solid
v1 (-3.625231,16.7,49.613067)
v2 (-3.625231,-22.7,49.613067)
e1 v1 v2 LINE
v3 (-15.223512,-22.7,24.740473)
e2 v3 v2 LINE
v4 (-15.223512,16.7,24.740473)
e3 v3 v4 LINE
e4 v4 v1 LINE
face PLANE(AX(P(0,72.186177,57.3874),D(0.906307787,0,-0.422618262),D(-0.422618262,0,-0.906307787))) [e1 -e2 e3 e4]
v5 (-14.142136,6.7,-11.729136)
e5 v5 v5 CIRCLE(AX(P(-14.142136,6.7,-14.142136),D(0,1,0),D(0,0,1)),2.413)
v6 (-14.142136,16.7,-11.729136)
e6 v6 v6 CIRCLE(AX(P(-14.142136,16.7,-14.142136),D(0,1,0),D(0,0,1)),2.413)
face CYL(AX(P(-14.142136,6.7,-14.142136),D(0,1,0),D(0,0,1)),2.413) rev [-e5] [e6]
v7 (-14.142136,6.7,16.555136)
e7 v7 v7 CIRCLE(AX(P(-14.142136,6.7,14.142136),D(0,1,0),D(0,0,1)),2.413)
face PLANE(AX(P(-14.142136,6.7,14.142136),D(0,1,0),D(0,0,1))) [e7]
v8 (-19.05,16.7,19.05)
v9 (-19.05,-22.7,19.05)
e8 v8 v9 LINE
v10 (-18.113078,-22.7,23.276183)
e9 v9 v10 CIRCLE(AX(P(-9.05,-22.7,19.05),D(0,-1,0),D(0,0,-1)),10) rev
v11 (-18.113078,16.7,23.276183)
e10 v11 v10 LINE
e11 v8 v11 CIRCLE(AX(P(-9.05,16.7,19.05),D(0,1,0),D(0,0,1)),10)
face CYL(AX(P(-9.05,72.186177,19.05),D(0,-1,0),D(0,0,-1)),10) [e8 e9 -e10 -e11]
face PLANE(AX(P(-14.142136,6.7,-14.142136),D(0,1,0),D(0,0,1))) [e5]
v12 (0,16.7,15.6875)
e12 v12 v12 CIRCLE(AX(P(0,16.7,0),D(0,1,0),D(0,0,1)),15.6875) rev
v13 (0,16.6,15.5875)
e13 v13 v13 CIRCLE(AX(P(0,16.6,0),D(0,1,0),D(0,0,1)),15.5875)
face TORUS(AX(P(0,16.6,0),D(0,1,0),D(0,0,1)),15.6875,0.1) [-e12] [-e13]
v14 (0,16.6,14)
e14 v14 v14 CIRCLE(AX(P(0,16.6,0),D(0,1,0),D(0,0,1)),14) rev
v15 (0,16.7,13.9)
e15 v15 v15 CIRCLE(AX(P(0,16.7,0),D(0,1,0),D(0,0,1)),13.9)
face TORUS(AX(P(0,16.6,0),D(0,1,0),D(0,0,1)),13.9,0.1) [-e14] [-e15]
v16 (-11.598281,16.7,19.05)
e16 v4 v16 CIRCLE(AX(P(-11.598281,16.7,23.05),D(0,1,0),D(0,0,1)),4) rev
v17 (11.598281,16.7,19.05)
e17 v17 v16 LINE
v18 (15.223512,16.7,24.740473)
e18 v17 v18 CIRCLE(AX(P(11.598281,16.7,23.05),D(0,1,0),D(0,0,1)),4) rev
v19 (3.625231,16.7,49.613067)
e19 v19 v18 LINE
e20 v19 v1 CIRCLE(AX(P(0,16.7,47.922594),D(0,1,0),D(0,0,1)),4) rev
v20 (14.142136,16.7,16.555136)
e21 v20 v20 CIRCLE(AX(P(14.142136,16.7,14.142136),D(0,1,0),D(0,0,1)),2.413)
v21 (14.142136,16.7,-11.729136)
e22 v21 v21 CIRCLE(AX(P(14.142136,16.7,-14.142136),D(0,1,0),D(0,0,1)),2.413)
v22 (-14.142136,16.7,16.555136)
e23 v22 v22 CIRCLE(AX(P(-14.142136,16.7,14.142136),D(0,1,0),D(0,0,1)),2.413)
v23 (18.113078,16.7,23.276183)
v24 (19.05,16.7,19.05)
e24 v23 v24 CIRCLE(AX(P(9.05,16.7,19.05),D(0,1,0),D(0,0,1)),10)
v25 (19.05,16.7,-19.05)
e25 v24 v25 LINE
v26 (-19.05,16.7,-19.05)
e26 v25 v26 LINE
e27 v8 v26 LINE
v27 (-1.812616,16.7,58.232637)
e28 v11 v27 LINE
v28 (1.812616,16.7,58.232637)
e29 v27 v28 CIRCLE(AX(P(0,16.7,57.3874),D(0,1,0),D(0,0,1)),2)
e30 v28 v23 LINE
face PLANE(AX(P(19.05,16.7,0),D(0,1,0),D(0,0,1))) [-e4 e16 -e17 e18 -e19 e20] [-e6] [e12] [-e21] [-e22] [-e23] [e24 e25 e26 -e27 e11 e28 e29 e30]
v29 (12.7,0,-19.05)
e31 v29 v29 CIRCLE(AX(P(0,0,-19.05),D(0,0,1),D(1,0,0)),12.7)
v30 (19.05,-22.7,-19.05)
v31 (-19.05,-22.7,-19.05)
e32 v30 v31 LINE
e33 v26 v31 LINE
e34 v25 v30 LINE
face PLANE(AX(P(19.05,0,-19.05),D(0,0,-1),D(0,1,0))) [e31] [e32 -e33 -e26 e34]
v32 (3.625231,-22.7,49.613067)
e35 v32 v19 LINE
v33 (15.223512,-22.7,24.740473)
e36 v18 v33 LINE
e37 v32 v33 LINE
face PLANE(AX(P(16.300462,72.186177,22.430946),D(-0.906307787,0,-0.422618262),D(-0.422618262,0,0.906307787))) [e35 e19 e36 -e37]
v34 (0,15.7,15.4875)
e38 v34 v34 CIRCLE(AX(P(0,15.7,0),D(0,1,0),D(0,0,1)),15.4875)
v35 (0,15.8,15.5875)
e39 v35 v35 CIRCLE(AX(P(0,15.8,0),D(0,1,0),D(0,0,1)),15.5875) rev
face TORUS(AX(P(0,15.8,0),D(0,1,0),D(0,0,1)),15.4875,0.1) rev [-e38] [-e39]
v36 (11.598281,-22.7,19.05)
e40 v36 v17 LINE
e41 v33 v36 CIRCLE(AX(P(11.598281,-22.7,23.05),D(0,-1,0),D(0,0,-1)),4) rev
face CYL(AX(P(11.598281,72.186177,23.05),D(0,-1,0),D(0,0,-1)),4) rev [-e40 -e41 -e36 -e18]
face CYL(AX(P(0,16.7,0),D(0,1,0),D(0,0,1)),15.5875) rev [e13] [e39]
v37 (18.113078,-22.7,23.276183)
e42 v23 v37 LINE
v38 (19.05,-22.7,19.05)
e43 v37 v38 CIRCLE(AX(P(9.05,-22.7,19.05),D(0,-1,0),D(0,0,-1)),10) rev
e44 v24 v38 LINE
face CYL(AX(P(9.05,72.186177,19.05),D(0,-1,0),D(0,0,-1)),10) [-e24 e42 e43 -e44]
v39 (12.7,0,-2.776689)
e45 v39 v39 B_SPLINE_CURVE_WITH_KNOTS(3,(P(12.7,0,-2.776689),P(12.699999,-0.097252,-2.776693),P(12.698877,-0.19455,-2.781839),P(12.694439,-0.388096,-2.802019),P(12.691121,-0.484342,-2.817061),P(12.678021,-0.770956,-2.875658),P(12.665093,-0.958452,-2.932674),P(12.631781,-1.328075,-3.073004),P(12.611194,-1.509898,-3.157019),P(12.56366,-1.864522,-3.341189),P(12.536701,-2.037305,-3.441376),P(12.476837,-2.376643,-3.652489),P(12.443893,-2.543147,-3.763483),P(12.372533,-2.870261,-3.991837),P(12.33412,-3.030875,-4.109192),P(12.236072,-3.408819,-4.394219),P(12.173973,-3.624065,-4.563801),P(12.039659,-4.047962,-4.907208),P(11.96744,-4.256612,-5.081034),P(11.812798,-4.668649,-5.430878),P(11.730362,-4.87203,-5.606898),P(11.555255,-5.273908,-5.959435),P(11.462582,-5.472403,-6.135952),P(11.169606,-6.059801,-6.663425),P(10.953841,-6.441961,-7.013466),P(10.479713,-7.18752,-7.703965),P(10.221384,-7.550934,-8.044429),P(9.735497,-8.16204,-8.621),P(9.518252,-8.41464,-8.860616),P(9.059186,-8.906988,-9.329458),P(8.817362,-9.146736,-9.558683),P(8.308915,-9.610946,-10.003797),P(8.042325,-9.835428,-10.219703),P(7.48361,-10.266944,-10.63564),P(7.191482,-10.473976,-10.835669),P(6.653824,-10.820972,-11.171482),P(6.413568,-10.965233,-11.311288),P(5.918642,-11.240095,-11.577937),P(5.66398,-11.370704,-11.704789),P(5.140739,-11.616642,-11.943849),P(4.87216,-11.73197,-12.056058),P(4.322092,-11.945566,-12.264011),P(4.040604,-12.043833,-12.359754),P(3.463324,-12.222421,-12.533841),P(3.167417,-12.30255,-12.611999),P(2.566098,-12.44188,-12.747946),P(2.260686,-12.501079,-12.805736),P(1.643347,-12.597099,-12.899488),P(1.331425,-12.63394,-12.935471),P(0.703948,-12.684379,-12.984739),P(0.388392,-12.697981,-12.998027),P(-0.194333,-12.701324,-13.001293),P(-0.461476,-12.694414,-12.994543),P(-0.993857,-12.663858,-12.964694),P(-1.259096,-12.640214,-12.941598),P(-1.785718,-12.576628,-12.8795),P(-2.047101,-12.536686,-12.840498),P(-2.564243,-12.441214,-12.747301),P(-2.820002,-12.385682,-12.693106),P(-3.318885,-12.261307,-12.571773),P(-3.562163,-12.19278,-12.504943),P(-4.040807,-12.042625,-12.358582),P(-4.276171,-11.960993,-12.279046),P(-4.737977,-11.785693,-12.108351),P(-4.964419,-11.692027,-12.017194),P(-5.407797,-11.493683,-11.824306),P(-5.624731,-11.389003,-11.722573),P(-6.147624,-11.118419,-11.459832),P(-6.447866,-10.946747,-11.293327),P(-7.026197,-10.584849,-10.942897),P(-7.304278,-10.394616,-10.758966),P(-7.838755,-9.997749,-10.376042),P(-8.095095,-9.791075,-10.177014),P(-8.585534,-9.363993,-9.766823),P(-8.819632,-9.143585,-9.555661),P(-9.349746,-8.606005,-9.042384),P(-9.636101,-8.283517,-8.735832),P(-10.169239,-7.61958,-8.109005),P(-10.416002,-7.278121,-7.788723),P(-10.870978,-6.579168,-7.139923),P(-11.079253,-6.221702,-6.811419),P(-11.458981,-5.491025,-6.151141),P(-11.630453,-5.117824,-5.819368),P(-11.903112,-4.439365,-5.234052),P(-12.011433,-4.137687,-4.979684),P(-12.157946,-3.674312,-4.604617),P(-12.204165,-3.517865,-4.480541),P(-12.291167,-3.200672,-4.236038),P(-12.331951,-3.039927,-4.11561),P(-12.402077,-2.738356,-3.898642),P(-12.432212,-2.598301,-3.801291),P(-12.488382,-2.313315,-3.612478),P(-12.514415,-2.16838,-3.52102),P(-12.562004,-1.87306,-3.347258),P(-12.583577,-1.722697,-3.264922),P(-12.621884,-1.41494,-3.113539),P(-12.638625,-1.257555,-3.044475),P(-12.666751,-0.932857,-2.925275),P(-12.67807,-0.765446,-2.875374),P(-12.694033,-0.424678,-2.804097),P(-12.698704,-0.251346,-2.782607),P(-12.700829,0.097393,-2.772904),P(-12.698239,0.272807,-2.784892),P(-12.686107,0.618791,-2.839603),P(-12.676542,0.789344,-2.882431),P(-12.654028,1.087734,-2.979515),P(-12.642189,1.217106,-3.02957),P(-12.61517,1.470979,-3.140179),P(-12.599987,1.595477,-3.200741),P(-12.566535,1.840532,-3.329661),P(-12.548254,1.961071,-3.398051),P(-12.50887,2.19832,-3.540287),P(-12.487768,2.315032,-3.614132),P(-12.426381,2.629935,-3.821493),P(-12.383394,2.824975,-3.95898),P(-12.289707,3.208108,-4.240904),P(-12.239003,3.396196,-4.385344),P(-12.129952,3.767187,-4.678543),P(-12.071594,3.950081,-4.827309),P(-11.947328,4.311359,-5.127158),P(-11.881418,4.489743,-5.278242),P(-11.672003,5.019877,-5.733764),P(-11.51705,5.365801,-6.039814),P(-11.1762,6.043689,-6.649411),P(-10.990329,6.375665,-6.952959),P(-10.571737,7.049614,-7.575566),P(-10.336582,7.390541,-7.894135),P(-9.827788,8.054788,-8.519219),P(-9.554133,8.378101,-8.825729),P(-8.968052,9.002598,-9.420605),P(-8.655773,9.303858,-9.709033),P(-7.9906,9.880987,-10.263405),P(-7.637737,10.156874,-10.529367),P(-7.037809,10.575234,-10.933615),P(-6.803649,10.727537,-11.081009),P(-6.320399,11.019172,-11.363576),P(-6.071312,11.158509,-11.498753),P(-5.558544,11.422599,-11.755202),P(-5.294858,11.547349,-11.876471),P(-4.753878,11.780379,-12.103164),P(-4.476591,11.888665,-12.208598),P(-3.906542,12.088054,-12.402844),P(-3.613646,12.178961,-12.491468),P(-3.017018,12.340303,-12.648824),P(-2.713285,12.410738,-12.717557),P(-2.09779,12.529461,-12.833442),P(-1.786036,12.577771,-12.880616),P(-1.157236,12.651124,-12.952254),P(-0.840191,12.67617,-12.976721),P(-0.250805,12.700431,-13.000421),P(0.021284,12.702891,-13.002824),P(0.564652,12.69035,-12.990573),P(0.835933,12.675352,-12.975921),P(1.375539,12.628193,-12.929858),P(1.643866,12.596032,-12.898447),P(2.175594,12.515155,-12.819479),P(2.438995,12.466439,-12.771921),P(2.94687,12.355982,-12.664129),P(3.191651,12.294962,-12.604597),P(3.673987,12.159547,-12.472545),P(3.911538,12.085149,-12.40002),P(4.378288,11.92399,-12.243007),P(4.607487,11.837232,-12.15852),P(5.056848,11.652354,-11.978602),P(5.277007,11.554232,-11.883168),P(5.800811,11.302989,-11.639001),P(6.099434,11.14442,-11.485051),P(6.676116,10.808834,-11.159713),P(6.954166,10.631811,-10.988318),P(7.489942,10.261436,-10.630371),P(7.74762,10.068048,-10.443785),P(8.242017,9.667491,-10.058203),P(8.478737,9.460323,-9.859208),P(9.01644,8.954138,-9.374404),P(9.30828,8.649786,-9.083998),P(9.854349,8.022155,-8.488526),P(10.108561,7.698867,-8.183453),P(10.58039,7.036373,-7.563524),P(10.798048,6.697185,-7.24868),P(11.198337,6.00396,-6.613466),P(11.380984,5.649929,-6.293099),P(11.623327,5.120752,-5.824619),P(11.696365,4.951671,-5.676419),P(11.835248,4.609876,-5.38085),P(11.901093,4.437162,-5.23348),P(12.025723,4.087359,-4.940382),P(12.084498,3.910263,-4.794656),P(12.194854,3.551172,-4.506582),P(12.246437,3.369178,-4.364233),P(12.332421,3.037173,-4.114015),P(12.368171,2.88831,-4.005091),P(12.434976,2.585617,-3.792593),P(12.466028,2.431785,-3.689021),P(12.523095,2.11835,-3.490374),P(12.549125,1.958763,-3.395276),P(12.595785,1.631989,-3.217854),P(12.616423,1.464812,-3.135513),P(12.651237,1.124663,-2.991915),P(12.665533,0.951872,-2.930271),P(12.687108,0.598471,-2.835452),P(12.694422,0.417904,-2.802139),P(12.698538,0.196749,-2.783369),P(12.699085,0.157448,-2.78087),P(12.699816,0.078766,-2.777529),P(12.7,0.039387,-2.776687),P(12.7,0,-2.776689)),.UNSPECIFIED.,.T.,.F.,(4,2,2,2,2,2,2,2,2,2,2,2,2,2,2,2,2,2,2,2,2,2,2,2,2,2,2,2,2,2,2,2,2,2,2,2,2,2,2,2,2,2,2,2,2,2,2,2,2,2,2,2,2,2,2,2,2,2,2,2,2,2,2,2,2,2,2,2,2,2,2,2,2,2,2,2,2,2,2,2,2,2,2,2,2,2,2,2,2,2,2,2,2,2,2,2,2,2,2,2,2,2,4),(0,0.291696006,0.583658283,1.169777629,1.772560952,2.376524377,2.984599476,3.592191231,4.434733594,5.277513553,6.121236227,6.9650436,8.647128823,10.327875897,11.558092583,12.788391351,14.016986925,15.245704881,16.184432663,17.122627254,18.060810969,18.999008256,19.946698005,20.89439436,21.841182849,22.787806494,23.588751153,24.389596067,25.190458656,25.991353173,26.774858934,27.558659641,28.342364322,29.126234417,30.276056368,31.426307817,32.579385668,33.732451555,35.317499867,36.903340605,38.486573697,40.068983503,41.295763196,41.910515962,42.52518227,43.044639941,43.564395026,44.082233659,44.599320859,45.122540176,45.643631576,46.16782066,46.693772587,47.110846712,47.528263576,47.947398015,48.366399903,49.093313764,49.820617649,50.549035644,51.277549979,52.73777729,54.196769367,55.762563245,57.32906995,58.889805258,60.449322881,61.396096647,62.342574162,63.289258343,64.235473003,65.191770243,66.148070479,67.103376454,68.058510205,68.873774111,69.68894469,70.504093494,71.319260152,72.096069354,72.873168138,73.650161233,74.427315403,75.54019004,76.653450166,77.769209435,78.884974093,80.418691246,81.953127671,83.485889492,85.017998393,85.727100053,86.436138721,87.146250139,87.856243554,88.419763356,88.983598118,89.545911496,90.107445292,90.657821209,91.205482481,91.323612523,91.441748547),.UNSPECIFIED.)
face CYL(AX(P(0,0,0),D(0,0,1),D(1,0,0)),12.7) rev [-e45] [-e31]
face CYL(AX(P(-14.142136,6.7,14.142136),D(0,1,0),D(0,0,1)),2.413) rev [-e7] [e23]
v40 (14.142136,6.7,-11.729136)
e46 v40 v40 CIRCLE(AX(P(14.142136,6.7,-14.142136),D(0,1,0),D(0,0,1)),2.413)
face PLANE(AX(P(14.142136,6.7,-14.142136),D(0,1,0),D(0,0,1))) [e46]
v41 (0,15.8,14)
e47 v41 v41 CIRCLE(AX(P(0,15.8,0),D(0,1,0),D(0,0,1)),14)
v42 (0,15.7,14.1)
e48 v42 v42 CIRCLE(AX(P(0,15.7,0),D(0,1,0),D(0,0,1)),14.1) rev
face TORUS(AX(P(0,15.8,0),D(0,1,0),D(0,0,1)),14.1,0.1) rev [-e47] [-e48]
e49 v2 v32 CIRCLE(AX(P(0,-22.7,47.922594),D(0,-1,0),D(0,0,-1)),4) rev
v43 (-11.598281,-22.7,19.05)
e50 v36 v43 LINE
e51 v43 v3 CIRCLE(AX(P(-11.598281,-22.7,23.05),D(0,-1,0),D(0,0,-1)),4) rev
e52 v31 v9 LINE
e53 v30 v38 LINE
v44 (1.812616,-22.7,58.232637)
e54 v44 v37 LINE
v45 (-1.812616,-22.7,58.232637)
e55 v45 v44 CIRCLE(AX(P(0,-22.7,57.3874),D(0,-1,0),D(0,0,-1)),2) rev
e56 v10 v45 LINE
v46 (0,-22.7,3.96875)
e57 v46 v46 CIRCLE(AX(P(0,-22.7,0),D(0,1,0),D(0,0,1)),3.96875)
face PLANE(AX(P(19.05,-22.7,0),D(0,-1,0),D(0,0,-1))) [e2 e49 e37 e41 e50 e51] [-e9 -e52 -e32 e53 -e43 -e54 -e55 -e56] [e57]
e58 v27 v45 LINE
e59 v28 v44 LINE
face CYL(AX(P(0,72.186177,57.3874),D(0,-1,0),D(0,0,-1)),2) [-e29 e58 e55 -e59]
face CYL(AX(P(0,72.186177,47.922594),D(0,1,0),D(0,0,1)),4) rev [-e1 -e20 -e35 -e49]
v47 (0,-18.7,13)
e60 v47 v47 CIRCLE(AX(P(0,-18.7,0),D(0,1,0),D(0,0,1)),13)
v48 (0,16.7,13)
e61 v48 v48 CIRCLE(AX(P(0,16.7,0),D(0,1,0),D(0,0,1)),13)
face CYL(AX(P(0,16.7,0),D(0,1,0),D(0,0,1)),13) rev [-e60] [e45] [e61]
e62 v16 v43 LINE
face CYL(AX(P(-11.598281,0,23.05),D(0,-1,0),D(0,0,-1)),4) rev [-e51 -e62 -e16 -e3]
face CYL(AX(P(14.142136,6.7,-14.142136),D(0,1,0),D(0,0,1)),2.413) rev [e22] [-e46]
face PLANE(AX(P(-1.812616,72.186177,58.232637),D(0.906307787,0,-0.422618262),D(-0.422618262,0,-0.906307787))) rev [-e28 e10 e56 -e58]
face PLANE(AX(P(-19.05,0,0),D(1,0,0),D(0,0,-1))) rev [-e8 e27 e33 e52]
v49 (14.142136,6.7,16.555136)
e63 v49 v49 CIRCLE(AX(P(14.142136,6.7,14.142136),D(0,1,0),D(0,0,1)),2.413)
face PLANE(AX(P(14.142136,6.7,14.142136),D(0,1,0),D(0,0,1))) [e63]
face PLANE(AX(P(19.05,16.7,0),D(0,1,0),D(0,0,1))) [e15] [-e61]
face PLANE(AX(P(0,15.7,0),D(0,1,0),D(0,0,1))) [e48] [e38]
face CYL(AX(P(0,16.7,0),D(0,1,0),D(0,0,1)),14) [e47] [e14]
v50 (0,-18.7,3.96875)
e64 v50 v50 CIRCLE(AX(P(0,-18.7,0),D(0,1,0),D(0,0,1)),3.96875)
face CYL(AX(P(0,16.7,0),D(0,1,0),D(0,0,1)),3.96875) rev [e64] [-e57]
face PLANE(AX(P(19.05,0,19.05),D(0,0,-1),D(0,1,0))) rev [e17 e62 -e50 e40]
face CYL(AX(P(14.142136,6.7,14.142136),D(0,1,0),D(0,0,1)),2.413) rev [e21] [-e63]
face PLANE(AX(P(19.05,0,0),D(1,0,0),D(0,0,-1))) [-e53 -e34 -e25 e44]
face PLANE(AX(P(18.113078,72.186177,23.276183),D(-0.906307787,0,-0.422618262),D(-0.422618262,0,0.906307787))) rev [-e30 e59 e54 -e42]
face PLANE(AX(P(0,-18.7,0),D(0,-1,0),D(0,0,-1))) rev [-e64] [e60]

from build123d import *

# Parameters (mm, degrees)
SKETCH1_W                       = 39.4
SKETCH1_H                       = 38.1
BOSS_EXTRUDE1_DEPTH             = 19.05
SKETCH1_4_W                     = 12.7
SKETCH1_4_H                     = 19.05
SKETCH1_5_W                     = 1
SKETCH1_5_H                     = 1.5875
FILLET2_R                       = 0.1
SKETCH2_R                       = 2.413
CUT_EXTRUDE1_DEPTH              = 10
EXTRUDE_THIN1_REACH             = 37.229
EXTRUDE_THIN1_DIRECTION_2_REACH = 37.229
FILLET5_R                       = 4


with BuildPart() as part:
    # Sketch1 → Boss-Extrude1 (new, symmetric)
    with BuildSketch(Plane.YZ):
        with Locations((-3, 0)):
            Rectangle(SKETCH1_W, SKETCH1_H)
    extrude(amount=BOSS_EXTRUDE1_DEPTH, both=True)

    # Sketch1<3> → Cut-Revolve1 (revolve, cut)
    with BuildSketch(Plane.YZ):
        Polygon((16.7, 0), (16.7, 13), (-18.7, 13), (-18.7, 3.96875), (-22.7, 3.96875), (-22.7, 0), align=None)
    revolve(axis=Axis((0, 16.7, 0), (0, -1, 0)), mode=Mode.SUBTRACT)

    # Sketch1<4> → Cut-Revolve2 (revolve, cut)
    with BuildSketch(Plane.YZ):
        with Locations((6.35, -9.525)):
            Rectangle(SKETCH1_4_W, SKETCH1_4_H)
    revolve(axis=Axis((0, 0, 0), (0, 0, -1)), mode=Mode.SUBTRACT)

    # Sketch1<5> → Cut-Revolve3 (revolve, cut)
    with BuildSketch(Plane.YZ):
        with Locations((16.2, 14.79375)):
            Rectangle(SKETCH1_5_W, SKETCH1_5_H)
    revolve(axis=Axis((0, 16.7, 0), (0, -1, 0)), mode=Mode.SUBTRACT)

    # Fillet2
    fillet2_edges = [part.edges().sort_by_distance(p)[0] for p in [
        (0, 16.7, -15.5875),
        (0, 15.7, -15.5875),
        (0, 15.7, -14),
        (0, 16.7, -14),
    ]]
    fillet(fillet2_edges, radius=FILLET2_R)

    # Sketch2 → Cut-Extrude1 (cut)
    with BuildSketch(Plane(origin=(0, 16.7, 0), x_dir=(-1, 0, 0), z_dir=(0, 1, 0))):
        with Locations((-14.142135624, 14.142135624)):
            Circle(SKETCH2_R)
        with Locations((14.142135624, 14.142135624)):
            Circle(SKETCH2_R)
        with Locations((14.142135624, -14.142135624)):
            Circle(SKETCH2_R)
        with Locations((-14.142135624, -14.142135624)):
            Circle(SKETCH2_R)
    extrude(amount=-CUT_EXTRUDE1_DEPTH, mode=Mode.SUBTRACT)

    # Extrude-Thin1: up to this face of the body (flat: up to its plane)
    extrude_thin1_end = Plane(part.part.faces().sort_by_distance((-18.511184633, 16.7, 0))[0])
    # Sketch3 → Extrude-Thin1 (add, up to the picked face)
    with BuildSketch(Plane(origin=(0, 0, 0), x_dir=(-1, 0, 0), z_dir=(0, 1, 0)), mode=Mode.PRIVATE) as extrude_thin1_sk1:
        with BuildLine():
            ThreePointArc((-19.05, 19.05), (-18.812960071, 21.214396139), (-18.11307787, 23.276182617))
            Line((-18.11307787, 23.276182617), (-1.812615574, 58.232636819))
            ThreePointArc((-1.812615574, 58.232636819), (0, 59.387400296), (1.812615574, 58.232636819))
            Line((1.812615574, 58.232636819), (18.11307787, 23.276182617))
            ThreePointArc((18.11307787, 23.276182617), (18.812960071, 21.214396139), (19.05, 19.05))
            Line((19.05, 19.05), (17.05, 19.05))
            ThreePointArc((17.05, 19.05), (16.860368057, 20.781516912), (16.300462296, 22.430946094))
            Line((16.300462296, 22.430946094), (0, 57.387400296))
            Line((0, 57.387400296), (-16.300462296, 22.430946094))
            ThreePointArc((-16.300462296, 22.430946094), (-16.860368057, 20.781516912), (-17.05, 19.05))
            Line((-17.05, 19.05), (-19.05, 19.05))
        make_face()
    extrude_thin1_tool1 = split(extrude(extrude_thin1_sk1.sketch, amount=EXTRUDE_THIN1_REACH, mode=Mode.PRIVATE), bisect_by=extrude_thin1_end, keep=Keep.BOTH, mode=Mode.PRIVATE)
    add(extrude_thin1_tool1.solids().sort_by(Axis((18.271251, 0, 21.094302), (0, 1, 0)))[0])

    # Extrude-Thin1 direction 2: up to this face of the body (flat: up to its plane)
    extrude_thin1_direction_2_end = Plane(part.part.faces().sort_by_distance((0, -22.7, 18.511184633))[0])
    # Sketch3 → Extrude-Thin1 direction 2 (add, up to the picked face)
    with BuildSketch(Plane(origin=(0, 0, 0), x_dir=(-1, 0, 0), z_dir=(0, 1, 0)), mode=Mode.PRIVATE) as extrude_thin1_direction_2_sk1:
        with BuildLine():
            ThreePointArc((-19.05, 19.05), (-18.812960071, 21.214396139), (-18.11307787, 23.276182617))
            Line((-18.11307787, 23.276182617), (-1.812615574, 58.232636819))
            ThreePointArc((-1.812615574, 58.232636819), (0, 59.387400296), (1.812615574, 58.232636819))
            Line((1.812615574, 58.232636819), (18.11307787, 23.276182617))
            ThreePointArc((18.11307787, 23.276182617), (18.812960071, 21.214396139), (19.05, 19.05))
            Line((19.05, 19.05), (17.05, 19.05))
            ThreePointArc((17.05, 19.05), (16.860368057, 20.781516912), (16.300462296, 22.430946094))
            Line((16.300462296, 22.430946094), (0, 57.387400296))
            Line((0, 57.387400296), (-16.300462296, 22.430946094))
            ThreePointArc((-16.300462296, 22.430946094), (-16.860368057, 20.781516912), (-17.05, 19.05))
            Line((-17.05, 19.05), (-19.05, 19.05))
        make_face()
    extrude_thin1_direction_2_tool1 = split(extrude(extrude_thin1_direction_2_sk1.sketch, amount=-EXTRUDE_THIN1_DIRECTION_2_REACH, mode=Mode.PRIVATE), bisect_by=extrude_thin1_direction_2_end, keep=Keep.BOTH, mode=Mode.PRIVATE)
    add(extrude_thin1_direction_2_tool1.solids().sort_by(Axis((18.271251, 0, 21.094302), (0, -1, 0)))[0])

    # Fillet5
    fillet5_edges = [part.edges().sort_by_distance(p)[0] for p in [
        (0, -3, 57.387400296),
        (17.05, -3, 19.05),
        (-17.05, -3, 19.05),
    ]]
    fillet(fillet5_edges, radius=FILLET5_R)


solid = part.part
